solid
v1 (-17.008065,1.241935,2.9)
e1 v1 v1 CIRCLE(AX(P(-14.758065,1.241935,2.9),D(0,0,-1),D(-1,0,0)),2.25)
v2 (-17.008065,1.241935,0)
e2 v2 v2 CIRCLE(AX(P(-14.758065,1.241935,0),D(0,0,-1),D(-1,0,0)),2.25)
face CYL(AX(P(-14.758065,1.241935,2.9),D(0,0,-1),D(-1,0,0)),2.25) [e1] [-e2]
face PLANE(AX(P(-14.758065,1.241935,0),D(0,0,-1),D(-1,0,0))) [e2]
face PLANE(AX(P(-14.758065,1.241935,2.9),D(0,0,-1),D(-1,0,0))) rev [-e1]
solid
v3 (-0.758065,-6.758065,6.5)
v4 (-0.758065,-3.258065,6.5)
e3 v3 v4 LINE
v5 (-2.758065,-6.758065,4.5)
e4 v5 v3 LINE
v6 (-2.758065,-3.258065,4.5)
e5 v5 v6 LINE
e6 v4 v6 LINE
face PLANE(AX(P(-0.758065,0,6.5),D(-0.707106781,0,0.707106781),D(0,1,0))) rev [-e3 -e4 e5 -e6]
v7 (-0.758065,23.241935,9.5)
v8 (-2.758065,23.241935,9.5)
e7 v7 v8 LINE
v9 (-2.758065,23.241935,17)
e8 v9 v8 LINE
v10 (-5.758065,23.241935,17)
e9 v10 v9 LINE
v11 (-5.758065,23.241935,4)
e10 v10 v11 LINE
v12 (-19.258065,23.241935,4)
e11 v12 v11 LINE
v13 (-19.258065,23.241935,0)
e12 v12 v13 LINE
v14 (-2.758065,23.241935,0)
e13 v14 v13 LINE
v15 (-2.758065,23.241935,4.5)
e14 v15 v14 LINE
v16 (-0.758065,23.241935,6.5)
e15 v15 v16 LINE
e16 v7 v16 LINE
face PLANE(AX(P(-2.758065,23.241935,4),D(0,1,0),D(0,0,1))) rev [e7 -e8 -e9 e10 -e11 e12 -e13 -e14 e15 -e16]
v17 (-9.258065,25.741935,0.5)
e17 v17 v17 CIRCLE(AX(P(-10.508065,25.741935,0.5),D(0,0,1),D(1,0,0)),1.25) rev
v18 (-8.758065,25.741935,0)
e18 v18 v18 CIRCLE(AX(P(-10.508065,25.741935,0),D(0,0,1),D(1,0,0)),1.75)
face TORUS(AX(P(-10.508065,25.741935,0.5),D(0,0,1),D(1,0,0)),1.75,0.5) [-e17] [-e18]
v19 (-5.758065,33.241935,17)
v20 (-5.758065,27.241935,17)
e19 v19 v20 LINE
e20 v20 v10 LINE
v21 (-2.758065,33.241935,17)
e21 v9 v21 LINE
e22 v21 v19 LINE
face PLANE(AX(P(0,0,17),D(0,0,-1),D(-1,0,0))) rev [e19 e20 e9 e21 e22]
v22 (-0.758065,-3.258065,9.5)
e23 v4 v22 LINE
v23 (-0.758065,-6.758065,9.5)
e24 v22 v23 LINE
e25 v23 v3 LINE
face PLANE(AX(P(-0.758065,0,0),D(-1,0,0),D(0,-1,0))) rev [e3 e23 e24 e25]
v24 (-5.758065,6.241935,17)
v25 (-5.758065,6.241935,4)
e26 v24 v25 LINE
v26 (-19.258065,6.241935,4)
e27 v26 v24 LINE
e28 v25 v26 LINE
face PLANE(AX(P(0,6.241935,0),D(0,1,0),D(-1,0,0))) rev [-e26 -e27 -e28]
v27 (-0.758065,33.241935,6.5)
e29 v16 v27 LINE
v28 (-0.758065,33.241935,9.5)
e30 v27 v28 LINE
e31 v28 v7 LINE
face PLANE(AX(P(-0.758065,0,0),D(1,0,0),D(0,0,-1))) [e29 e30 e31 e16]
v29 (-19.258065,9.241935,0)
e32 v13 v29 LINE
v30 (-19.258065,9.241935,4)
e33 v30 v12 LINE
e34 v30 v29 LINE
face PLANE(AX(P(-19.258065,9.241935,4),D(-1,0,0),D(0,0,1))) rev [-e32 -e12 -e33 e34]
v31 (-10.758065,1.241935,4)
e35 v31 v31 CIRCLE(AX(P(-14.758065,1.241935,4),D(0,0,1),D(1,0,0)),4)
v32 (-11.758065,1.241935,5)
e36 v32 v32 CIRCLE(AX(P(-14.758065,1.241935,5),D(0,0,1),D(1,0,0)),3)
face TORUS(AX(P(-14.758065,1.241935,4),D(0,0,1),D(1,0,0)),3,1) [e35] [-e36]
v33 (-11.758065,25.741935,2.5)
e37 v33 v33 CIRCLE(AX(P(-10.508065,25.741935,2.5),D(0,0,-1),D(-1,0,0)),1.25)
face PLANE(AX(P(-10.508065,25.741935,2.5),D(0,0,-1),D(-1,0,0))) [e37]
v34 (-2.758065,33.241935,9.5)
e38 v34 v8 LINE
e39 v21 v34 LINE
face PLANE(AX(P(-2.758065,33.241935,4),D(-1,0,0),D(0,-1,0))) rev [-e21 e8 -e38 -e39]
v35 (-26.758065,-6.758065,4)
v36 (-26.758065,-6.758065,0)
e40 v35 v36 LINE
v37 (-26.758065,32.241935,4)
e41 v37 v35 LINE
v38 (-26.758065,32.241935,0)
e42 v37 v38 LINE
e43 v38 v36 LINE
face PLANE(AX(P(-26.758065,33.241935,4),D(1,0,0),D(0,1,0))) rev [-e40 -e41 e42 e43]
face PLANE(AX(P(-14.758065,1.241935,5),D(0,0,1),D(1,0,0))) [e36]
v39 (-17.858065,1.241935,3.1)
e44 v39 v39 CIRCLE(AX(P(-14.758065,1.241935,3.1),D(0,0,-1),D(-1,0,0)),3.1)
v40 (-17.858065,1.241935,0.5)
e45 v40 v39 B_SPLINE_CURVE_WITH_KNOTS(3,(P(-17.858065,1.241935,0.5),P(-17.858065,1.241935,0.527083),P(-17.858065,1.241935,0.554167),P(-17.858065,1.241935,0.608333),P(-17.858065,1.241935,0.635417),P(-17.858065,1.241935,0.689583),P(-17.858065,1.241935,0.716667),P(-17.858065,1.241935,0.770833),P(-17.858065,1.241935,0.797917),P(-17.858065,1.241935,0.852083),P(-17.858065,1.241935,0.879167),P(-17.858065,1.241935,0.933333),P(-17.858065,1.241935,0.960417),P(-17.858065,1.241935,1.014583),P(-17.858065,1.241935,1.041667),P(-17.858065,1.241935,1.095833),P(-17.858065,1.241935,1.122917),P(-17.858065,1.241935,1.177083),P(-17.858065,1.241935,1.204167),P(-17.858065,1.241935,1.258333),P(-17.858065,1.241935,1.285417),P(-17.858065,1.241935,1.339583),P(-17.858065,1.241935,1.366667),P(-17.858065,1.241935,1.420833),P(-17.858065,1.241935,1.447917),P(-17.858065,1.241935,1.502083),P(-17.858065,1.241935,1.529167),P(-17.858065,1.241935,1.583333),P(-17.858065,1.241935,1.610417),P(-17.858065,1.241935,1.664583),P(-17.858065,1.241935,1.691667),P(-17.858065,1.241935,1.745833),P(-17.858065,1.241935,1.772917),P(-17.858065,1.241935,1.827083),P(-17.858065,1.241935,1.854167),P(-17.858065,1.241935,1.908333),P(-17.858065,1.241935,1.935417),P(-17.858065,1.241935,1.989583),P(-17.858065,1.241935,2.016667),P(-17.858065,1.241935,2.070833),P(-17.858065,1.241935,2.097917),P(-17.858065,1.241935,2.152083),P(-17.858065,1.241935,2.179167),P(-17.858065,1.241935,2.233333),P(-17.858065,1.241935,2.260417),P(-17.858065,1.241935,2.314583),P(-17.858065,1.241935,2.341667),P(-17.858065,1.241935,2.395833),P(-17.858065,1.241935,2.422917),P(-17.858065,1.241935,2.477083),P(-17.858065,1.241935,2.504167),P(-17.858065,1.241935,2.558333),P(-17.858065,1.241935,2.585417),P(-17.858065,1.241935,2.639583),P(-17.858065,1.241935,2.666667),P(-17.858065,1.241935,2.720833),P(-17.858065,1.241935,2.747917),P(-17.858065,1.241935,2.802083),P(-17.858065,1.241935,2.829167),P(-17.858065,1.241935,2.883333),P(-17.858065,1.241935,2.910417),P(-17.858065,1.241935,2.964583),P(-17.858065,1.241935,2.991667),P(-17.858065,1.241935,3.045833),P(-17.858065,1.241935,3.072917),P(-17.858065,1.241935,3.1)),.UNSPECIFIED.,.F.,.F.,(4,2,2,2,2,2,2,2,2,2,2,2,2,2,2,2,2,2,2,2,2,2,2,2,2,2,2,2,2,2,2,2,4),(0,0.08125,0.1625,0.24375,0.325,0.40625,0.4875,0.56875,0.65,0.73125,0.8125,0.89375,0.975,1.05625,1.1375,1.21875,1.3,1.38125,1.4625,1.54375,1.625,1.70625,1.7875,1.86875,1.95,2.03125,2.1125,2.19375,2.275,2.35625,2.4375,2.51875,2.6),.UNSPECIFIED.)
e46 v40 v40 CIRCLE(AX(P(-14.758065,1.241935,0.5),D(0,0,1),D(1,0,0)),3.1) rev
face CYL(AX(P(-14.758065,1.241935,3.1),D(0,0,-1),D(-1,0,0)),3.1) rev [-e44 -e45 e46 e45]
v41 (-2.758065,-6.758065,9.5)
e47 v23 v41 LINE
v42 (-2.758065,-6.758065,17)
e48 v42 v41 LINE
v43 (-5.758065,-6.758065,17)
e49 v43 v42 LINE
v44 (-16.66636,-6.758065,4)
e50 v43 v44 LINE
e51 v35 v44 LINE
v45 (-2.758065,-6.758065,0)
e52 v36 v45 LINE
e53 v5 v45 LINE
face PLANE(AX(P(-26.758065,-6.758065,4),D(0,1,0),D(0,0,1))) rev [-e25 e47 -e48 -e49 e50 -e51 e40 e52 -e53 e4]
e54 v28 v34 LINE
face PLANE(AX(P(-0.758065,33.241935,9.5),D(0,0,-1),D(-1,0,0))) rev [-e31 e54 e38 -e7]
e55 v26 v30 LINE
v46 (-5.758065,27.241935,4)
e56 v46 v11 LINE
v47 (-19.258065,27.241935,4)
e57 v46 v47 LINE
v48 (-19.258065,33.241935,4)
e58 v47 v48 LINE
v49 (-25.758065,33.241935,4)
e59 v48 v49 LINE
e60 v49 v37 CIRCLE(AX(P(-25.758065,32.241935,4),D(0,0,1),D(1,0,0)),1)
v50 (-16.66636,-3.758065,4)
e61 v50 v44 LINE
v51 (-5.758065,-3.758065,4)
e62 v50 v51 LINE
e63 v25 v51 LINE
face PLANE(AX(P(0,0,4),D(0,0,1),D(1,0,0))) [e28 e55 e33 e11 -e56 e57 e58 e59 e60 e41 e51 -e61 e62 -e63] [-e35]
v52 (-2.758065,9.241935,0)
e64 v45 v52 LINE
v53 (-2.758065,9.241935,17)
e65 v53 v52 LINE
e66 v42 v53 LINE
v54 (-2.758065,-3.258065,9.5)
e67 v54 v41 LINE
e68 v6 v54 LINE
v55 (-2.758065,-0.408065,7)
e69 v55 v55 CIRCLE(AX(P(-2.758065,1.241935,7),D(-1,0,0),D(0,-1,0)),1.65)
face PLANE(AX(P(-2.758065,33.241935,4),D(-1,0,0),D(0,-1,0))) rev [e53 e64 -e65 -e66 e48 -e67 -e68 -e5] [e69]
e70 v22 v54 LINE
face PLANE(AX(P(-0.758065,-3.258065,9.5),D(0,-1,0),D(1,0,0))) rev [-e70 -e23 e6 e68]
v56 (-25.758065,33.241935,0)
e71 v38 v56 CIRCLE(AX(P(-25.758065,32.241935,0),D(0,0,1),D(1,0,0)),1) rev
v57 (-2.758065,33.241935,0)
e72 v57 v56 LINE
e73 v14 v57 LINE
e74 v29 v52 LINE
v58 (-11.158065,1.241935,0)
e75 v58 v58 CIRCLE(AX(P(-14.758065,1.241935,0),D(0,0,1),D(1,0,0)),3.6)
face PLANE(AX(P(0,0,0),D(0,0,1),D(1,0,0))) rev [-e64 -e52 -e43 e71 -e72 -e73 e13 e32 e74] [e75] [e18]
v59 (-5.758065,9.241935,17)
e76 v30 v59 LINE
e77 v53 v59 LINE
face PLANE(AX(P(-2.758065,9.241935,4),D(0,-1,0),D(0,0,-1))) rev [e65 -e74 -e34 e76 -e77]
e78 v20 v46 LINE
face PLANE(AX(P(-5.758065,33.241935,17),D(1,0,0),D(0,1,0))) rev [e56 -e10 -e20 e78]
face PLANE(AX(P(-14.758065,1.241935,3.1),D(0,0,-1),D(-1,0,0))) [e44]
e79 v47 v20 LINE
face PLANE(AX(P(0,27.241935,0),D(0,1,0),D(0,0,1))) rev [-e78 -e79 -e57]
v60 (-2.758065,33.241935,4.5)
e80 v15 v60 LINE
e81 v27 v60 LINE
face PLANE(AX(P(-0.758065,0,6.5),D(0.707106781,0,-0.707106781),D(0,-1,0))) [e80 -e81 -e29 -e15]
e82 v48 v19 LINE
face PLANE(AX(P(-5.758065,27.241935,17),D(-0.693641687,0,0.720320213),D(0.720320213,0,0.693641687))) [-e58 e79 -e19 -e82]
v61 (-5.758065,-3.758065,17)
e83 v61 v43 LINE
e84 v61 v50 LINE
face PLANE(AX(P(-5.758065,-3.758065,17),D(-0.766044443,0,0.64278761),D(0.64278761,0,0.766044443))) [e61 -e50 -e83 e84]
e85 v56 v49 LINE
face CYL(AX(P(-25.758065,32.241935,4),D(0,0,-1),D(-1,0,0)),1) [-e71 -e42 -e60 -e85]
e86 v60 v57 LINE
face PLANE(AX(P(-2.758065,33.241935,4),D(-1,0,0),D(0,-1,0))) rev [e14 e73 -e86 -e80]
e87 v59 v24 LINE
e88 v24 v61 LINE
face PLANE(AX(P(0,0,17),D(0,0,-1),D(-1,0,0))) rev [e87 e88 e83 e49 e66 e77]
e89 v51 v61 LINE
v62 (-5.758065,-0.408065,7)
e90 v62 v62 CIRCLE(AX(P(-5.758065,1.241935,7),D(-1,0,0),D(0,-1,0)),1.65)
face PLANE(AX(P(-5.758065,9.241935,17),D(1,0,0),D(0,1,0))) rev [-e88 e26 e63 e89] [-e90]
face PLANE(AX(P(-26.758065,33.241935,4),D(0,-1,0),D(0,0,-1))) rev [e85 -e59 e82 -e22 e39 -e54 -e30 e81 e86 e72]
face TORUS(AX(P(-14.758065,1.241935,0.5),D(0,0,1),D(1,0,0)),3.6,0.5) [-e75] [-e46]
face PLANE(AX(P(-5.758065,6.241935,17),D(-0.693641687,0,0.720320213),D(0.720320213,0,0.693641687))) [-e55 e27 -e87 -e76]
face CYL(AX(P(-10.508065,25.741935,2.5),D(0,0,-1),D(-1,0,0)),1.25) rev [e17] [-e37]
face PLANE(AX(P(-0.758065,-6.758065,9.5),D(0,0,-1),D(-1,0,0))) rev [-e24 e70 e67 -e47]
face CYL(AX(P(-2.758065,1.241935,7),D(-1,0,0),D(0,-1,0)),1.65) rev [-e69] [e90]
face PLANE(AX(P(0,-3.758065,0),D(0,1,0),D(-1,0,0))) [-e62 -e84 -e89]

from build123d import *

# Parameters (mm, degrees)
SKETCH1_W               = 24
SKETCH1_H               = 40
BOSS_EXTRUDE1_DEPTH     = 4
FILLET1_R               = 1
CUT_EXTRUDE2_DEPTH      = 43.860474698
CUT_EXTRUDE2_DEPTH_BACK = 43.860474698
SKETCH3_W               = 16.5
SKETCH3_H               = 14
SKETCH5_W               = 3
SKETCH5_H               = 16
BOSS_EXTRUDE2_DEPTH     = 13
BOSS_EXTRUDE3_DEPTH     = 3
BOSS_EXTRUDE4_DEPTH     = 3
SKETCH8_R               = 1.65
CUT_EXTRUDE4_DEPTH      = 3
SKETCH9_W               = 3
SKETCH9_H               = 10
BOSS_EXTRUDE5_DEPTH     = 13
BOSS_EXTRUDE6_DEPTH     = 6
SKETCH11_W              = 5
SKETCH11_H              = 10
BOSS_EXTRUDE7_DEPTH     = 2
CHAMFER1_SIZE           = 2
SKETCH12_R              = 3.1
CUT_EXTRUDE5_DEPTH      = 3.1
SKETCH17_R              = 4
BOSS_EXTRUDE8_DEPTH     = 1
FILLET3_R               = 1
SKETCH21_R              = 2.25
BOSS_EXTRUDE11_DEPTH    = 2.9
SKETCH23_W              = 5
SKETCH23_H              = 3.5
BOSS_EXTRUDE12_DEPTH    = 2
CHAMFER2_SIZE           = 2
FILLET6_R               = 0.5
SKETCH24_R              = 1.25
CUT_EXTRUDE6_DEPTH      = 2.5
FILLET7_R               = 0.5


with BuildPart() as part:
    # Sketch1 → Boss-Extrude1 (new body)
    with BuildSketch(Plane.XY):
        with Locations((-14.758064516, 13.241935484)):
            Rectangle(SKETCH1_W, SKETCH1_H)
    extrude(amount=BOSS_EXTRUDE1_DEPTH)

    # Fillet1
    fillet1_edges = [part.edges().sort_by_distance(p)[0] for p in [
        (-26.758064516, 33.241935484, 2),
    ]]
    fillet(fillet1_edges, radius=FILLET1_R)

    # Sketch3 → Cut-Extrude2 (cut, two sides: drawn at the far end of the back side and taken through both)
    with BuildSketch(Plane(origin=(0, 0, 0), x_dir=(-1, 0, 0), z_dir=(0, 0, -1)).offset(-CUT_EXTRUDE2_DEPTH_BACK)):
        with Locations((11.008064516, 16.241935484)):
            Rectangle(SKETCH3_W, SKETCH3_H)
    extrude(amount=CUT_EXTRUDE2_DEPTH + CUT_EXTRUDE2_DEPTH_BACK, mode=Mode.SUBTRACT)

    # Sketch5 → Boss-Extrude2 (add)
    with BuildSketch(Plane.XY.offset(4)):
        with Locations((-4.258064516, 1.241935484)):
            Rectangle(SKETCH5_W, SKETCH5_H)
    extrude(amount=BOSS_EXTRUDE2_DEPTH)

    # Sketch6 → Boss-Extrude3 (add)
    with BuildSketch(Plane.XZ.offset(6.758064516)):
        Polygon((-5.758064516, 17), (-16.666359721, 4), (-5.758064516, 4), align=None)
    extrude(amount=-BOSS_EXTRUDE3_DEPTH)

    # Sketch7 → Boss-Extrude4 (add)
    with BuildSketch(Plane(origin=(0, 9.241935484, 0), x_dir=(1, 0, 0), z_dir=(0, 1, 0))):
        Polygon((-5.758064516, -17), (-19.258064516, -4), (-5.758064516, -4), align=None)
    extrude(amount=-BOSS_EXTRUDE4_DEPTH)

    # Sketch8 → Cut-Extrude4 (cut)
    with BuildSketch(Plane.ZY.offset(5.758064516)):
        with Locations(Location((7, 1.241935484, 0), (0, 0, 270))):
            Circle(SKETCH8_R)
    extrude(amount=-CUT_EXTRUDE4_DEPTH, mode=Mode.SUBTRACT)

    # Sketch9 → Boss-Extrude5 (add)
    with BuildSketch(Plane.XY.offset(4)):
        with Locations((-4.258064516, 28.241935484)):
            Rectangle(SKETCH9_W, SKETCH9_H)
    extrude(amount=BOSS_EXTRUDE5_DEPTH)

    # Sketch10 → Boss-Extrude6 (add)
    with BuildSketch(Plane(origin=(0, 33.241935484, 0), x_dir=(1, 0, 0), z_dir=(0, 1, 0))):
        Polygon((-5.758064516, -17), (-19.258064516, -4), (-5.758064516, -4), align=None)
    extrude(amount=-BOSS_EXTRUDE6_DEPTH)

    # Sketch11 → Boss-Extrude7 (add)
    with BuildSketch(Plane(origin=(-2.758064516, 0, 0), x_dir=(0, 0, -1), z_dir=(1, 0, 0))):
        with Locations((-7, 28.241935484)):
            Rectangle(SKETCH11_W, SKETCH11_H)
    extrude(amount=BOSS_EXTRUDE7_DEPTH)

    # Chamfer1
    chamfer1_edges = [part.edges().sort_by_distance(p)[0] for p in [
        (-0.758064516, 28.241935484, 4.5),
    ]]
    chamfer(chamfer1_edges, length=CHAMFER1_SIZE - 0.0001)  # a hair under: the kernel refuses the full size

    # Sketch12 → Cut-Extrude5 (cut)
    with BuildSketch(Plane(origin=(0, 0, 0), x_dir=(-1, 0, 0), z_dir=(0, 0, -1))):
        with Locations((14.758064516, 1.241935484)):
            Circle(SKETCH12_R)
    extrude(amount=-CUT_EXTRUDE5_DEPTH, mode=Mode.SUBTRACT)

    # Sketch17 → Boss-Extrude8 (add)
    with BuildSketch(Plane.XY.offset(4)):
        with Locations((-14.758064516, 1.241935484)):
            Circle(SKETCH17_R)
    extrude(amount=BOSS_EXTRUDE8_DEPTH)

    # Fillet3
    fillet3_edges = [part.edges().sort_by_distance(p)[0] for p in [
        (-18.758064516, 1.241935484, 5),
    ]]
    fillet(fillet3_edges, radius=FILLET3_R - 0.0001)  # a hair under: the kernel refuses the full size

    # Sketch23 → Boss-Extrude12 (add)
    with BuildSketch(Plane(origin=(-2.758064516, 0, 0), x_dir=(0, 0, -1), z_dir=(1, 0, 0))):
        with Locations((-7, -5.008064516)):
            Rectangle(SKETCH23_W, SKETCH23_H)
    extrude(amount=BOSS_EXTRUDE12_DEPTH)

    # Chamfer2
    chamfer2_edges = [part.edges().sort_by_distance(p)[0] for p in [
        (-0.758064516, -5.008064516, 4.5),
    ]]
    chamfer(chamfer2_edges, length=CHAMFER2_SIZE - 0.0001)  # a hair under: the kernel refuses the full size

    # Fillet6
    fillet6_edges = [part.edges().sort_by_distance(p)[0] for p in [
        (-11.658064516, 1.241935484, 0),
    ]]
    fillet(fillet6_edges, radius=FILLET6_R)

    # Sketch24 → Cut-Extrude6 (cut)
    with BuildSketch(Plane(origin=(0, 0, 0), x_dir=(-1, 0, 0), z_dir=(0, 0, -1))):
        with Locations((10.508064516, 25.741935484)):
            Circle(SKETCH24_R)
    extrude(amount=-CUT_EXTRUDE6_DEPTH, mode=Mode.SUBTRACT)

    # Fillet7
    fillet7_edges = [part.edges().sort_by_distance(p)[0] for p in [
        (-9.258064516, 25.741935484, 0),
    ]]
    fillet(fillet7_edges, radius=FILLET7_R)


with BuildPart() as body_2:
    # Sketch21 → Boss-Extrude11 (new body)
    with BuildSketch(Plane(origin=(0, 0, 0), x_dir=(-1, 0, 0), z_dir=(0, 0, -1))):
        with Locations((14.758064516, 1.241935484)):
            Circle(SKETCH21_R)
    extrude(amount=-BOSS_EXTRUDE11_DEPTH)


solid = Compound([part.part, body_2.part])
